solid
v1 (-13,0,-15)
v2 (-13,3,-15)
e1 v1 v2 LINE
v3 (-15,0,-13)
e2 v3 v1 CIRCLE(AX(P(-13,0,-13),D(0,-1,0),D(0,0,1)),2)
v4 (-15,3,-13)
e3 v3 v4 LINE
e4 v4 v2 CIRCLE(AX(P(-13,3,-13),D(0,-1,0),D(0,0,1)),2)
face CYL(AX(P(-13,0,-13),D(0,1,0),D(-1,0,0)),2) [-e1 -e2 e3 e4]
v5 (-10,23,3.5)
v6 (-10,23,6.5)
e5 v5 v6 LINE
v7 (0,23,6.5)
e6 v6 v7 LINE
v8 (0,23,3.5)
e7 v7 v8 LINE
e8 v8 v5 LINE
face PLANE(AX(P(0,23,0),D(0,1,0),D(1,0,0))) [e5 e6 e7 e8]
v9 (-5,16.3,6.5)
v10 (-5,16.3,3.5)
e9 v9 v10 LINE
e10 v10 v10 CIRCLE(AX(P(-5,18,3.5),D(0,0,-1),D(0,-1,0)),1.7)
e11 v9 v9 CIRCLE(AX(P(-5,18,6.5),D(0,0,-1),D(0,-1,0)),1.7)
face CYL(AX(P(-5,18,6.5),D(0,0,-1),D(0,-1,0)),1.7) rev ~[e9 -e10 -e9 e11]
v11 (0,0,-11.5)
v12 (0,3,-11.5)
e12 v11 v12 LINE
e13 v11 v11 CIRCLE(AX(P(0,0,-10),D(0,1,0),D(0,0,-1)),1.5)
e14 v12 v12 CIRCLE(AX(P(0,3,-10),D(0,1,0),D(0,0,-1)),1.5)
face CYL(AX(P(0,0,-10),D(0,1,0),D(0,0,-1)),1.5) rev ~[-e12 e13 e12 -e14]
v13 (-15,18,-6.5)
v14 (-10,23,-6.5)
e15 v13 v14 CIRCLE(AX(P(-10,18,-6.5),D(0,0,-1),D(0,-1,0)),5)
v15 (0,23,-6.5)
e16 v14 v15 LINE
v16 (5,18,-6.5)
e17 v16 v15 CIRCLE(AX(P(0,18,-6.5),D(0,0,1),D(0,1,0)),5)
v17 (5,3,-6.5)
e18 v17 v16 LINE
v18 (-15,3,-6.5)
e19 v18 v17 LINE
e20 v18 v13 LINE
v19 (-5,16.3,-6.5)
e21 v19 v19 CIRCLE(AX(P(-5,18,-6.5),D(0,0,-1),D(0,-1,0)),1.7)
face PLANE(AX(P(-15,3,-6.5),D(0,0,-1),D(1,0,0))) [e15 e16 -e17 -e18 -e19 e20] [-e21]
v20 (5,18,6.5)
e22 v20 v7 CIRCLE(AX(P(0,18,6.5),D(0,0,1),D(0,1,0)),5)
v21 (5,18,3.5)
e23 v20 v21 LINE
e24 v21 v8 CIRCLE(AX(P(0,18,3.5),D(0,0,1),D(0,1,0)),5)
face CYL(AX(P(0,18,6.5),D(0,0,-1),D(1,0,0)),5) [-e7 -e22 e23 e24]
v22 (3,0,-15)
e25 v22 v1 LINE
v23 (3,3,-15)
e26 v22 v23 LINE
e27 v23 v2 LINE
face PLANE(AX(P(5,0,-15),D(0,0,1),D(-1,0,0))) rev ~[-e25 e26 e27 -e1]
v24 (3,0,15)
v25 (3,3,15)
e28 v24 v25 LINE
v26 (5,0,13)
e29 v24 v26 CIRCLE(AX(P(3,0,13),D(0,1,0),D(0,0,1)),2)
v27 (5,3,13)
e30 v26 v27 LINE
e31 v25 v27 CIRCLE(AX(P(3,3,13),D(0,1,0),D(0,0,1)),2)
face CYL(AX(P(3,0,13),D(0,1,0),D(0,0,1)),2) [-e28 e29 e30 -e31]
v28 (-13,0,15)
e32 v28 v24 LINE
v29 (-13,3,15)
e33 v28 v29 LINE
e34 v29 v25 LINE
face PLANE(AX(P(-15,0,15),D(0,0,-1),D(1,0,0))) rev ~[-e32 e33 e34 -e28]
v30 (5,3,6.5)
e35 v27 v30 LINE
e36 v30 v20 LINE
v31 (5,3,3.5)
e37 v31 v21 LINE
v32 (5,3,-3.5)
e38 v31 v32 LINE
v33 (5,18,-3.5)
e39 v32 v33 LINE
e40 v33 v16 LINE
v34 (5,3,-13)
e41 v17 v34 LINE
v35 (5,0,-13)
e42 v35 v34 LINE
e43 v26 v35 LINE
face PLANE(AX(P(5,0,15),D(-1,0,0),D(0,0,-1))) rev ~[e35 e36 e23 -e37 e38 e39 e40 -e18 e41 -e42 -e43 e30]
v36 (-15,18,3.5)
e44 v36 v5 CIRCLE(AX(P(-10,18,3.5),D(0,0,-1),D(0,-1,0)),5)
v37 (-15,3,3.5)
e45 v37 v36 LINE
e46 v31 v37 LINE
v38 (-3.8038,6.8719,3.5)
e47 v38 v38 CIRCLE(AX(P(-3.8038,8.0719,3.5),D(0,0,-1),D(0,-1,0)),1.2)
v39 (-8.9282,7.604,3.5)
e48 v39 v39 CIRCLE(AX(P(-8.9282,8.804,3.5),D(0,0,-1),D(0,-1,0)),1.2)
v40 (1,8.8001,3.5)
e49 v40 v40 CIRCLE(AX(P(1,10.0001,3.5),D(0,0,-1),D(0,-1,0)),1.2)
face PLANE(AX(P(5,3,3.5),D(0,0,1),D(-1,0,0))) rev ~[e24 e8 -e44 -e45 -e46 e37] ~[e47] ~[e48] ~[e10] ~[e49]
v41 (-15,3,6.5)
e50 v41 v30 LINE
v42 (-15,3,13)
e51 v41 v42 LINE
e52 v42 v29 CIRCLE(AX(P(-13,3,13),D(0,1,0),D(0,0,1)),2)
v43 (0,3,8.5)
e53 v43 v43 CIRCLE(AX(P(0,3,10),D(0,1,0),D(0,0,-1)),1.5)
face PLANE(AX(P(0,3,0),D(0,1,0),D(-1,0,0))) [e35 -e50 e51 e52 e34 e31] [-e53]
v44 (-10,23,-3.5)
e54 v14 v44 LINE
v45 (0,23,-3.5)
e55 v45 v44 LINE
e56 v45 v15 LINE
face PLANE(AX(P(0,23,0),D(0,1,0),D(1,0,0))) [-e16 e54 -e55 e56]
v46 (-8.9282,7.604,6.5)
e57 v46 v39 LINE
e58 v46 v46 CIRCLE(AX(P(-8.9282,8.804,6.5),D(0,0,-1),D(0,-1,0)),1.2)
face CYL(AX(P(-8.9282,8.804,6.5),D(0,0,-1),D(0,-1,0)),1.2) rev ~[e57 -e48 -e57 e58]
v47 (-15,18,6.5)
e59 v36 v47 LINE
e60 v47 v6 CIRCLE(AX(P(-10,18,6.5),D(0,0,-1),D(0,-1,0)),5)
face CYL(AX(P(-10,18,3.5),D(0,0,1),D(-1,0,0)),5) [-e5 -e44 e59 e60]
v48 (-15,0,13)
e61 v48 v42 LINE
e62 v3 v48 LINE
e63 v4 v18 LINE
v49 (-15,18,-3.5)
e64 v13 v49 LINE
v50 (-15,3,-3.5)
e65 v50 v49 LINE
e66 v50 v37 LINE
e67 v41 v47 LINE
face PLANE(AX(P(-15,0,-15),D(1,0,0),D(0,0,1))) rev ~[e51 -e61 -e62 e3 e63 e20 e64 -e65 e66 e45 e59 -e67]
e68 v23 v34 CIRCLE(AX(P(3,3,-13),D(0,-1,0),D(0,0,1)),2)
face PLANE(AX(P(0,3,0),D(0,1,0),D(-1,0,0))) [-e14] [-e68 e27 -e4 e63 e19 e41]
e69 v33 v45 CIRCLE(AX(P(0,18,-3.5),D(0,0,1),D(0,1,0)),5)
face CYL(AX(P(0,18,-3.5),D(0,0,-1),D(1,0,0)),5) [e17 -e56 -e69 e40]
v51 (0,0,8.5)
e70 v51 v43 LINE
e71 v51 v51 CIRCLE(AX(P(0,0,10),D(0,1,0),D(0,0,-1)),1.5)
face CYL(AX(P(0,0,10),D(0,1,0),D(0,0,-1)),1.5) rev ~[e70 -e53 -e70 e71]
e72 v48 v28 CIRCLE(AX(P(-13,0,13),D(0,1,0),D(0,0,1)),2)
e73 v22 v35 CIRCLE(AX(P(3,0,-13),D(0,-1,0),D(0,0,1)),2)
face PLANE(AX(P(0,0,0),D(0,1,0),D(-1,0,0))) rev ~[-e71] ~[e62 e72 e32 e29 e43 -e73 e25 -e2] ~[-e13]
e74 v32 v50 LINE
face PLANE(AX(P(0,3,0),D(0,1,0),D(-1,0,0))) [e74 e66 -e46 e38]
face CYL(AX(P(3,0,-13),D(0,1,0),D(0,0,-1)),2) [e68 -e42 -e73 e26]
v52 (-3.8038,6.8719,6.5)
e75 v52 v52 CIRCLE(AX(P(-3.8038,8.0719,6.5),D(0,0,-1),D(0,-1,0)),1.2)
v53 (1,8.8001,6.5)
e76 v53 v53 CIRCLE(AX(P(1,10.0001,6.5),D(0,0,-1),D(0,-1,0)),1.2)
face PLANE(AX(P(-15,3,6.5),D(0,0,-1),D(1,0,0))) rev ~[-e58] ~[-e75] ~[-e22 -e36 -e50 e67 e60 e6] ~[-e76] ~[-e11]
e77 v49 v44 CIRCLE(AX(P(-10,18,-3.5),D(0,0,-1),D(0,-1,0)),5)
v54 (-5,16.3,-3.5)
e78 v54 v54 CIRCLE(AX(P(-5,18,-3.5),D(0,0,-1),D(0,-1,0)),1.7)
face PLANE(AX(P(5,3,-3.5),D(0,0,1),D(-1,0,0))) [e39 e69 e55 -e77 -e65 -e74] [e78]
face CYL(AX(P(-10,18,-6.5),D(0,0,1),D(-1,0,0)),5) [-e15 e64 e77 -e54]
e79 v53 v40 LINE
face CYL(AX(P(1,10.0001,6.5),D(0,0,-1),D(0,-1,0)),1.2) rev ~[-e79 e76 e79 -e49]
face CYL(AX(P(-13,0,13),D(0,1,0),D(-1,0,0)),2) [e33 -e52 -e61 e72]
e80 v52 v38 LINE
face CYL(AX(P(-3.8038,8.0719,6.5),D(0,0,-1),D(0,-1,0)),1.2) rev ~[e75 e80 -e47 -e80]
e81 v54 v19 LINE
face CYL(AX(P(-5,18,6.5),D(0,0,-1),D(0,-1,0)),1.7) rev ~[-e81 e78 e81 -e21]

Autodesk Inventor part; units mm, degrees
ref_plane "YZ Plane" through (0, 0, 0) normal (1, 0, 0) x (0, 1, 0)
ref_plane "XZ Plane" through (0, 0, 0) normal (0, 1, 0) x (-1, 0, 0)
ref_plane "XY Plane" through (0, 0, 0) normal (0, 0, 1) x (1, 0, 0)
sketch "Szkic1" plane through (0, 0, 0) normal (0, 1, 0) x (-1, 0, 0)
  line L0 (15, 15) -> (-5, 15)
  line L1 (-5, 15) -> (-5, -15)
  line L2 (-5, -15) -> (15, -15)
  line L3 (15, -15) -> (15, 15)
  point P0 (0, 0)
  point P1 (0, 10)
  point P2 (0, -10)
  dimension "d0" = 20
  dimension "d1" = 20
  dimension "d2" = 15
  dimension "d3" = 5
  dimension "d4" = 5
extrude "Wyciągnięcie proste1" add sketch "Szkic1" along normal blind 3
hole "Otwór1" at (0, 0, 10) at (0, 0, -10) direction (0, 1, 0) diameter 3 end through all
sketch "Szkic2" plane through (0, 3, 0) normal (0, 1, 0) x (1, 0, 0)
  circle A0 centre (0, -10) radius 1.5 projected
  circle A1 centre (0, 10) radius 1.5 projected
  line L0 (-15, -15) -> (5, -15) projected
  line L1 (5, -15) -> (5, 15) projected
  line L2 (5, 15) -> (-15, 15) projected
  line L3 (-15, 15) -> (-15, -15) projected
  line L4 (5, -15) -> (5, 15) projected
  line L5 (-15, -6.5) -> (5, -6.5)
  line L6 (5, -6.5) -> (5, -3.5)
  line L7 (5, -3.5) -> (-15, -3.5)
  line L8 (-15, -3.5) -> (-15, -6.5)
  line L9 (-15, 15) -> (-15, -15) projected
  line L10 (-15, 6.5) -> (5, 6.5)
  line L11 (5, 6.5) -> (5, 3.5)
  line L12 (5, 3.5) -> (-15, 3.5)
  line L13 (-15, 3.5) -> (-15, 6.5)
  point P0 (0, 0)
  dimension "d14" = 3
  dimension "d15" = 3
  dimension "d16" = 2
  dimension "d17" = 2
fillet "Zaokrąglenie1" radius 2 4 edges at (5, 1.5, 15) (-15, 1.5, 15) (5, 1.5, -15) (-15, 1.5, -15)
extrude "Wyciągnięcie proste2" add sketch "Szkic2" along normal blind 20 contours L3 L7 L1 L5 | L3 L10 L1 L12
fillet "Zaokrąglenie2" radius 5 4 edges at (-15, 23, 5) (5, 23, 5) (5, 23, -5) (-15, 23, -5)
sketch "Szkic3" plane through (-15, 3, 6.5) normal (0, 0, 1) x (1, 0, 0)
  arc A0 (5, 20) -> (0, 15) centre (5, 15) ccw projected
  line L0 (0, 0) -> (0, 15) projected
  line L1 (20, 0) -> (0, 0) projected
  line L2 (20, 0) -> (20, 15) projected
  arc A1 (20, 15) -> (15, 20) centre (15, 15) ccw projected
  line L3 (5, 20) -> (15, 20) projected
  point P0 (15, -3)
  point P1 (10, 15)
  dimension "d52" = 10
hole "Otwór2" at (-5, 18, 6.5) direction (0, 0, -1) diameter 3.4 end through all clearance for "Śruba ze łbem płaskim obrobiona" size "M3" standard "ANSI Profil metryczny M"
sketch "Szkic4" plane through (-15, 3, 6.5) normal (0, 0, 1) x (1, 0, 0)
  arc A0 (5, 20) -> (0, 15) centre (5, 15) ccw projected
  line L0 (0, 0) -> (0, 15) projected
  line L1 (20, 0) -> (0, 0) projected
  line L2 (20, 0) -> (20, 15) projected
  circle A1 centre (10, 15.0001) radius 10 construction
  arc A2 (20, 15) -> (15, 20) centre (15, 15) ccw projected
  line L3 (5, 20) -> (15, 20) projected
  point P0 (15, -3)
  point P1 (6.0718, 5.804)
  point P2 (16, 7.0001)
  point P3 (11.1962, 5.0719)
  dimension "d33" = 20
  dimension "d53" = 30
  dimension "d54" = 30
  dimension "d62" = 4
hole "Otwór5" at (-8.9282, 8.804, 6.5) at (1, 10.0001, 6.5) at (-3.8038, 8.0719, 6.5) direction (0, 0, -1) diameter 2.4 end up to surface clearance for "Śruba ze łbem płaskim obrobiona" size "M2" standard "ANSI Profil metryczny M"
sketch "Szkic5" plane through (-15, 3, 6.5) normal (0, 0, 1) x (1, 0, 0)
  circle A0 centre (0, 0) radius 55 construction
  circle A1 centre (137.9996, 0.347) radius 55 construction
  circle A2 centre (275.9991, 0.6941) radius 55 construction
  line L0 (-173.3991, 195.8773) -> (-173.4121, 201.0636) construction
  line L1 (-173.3991, 247) -> (-173.3991, -116) construction
  line L2 (275.9991, -54.3059) -> (-673, -54.3059) construction
  line L3 (-488.3991, -4.3059) -> (-438.3991, -4.3059) construction
  line L4 (-438.3991, -4.3059) -> (-438.3991, -54.3059) construction
  line L5 (-438.3991, -54.3059) -> (-488.3991, -54.3059) construction
  line L6 (-488.3991, -54.3059) -> (-488.3991, -4.3059) construction
  line L7 (-438.4326, 222.6941) -> (233, 222.6941) construction
  line L8 (-438.4326, 192.6941) -> (378, 192.6941) construction
  line L9 (-476, 207.6941) -> (256, 207.6941) construction
  point P0 (15, -3)
  dimension "d63" = 50
  dimension "d64" = 50
  dimension "d65" = 265
  dimension "d66" = 277
  dimension "d67" = 30
  dimension "d68" = 15
equation "\"d4\" = d3"
equation "\"d15\" = d14"
equation "\"d54\" = d53"
equation "\"d68\" = 0.5 * d67"
